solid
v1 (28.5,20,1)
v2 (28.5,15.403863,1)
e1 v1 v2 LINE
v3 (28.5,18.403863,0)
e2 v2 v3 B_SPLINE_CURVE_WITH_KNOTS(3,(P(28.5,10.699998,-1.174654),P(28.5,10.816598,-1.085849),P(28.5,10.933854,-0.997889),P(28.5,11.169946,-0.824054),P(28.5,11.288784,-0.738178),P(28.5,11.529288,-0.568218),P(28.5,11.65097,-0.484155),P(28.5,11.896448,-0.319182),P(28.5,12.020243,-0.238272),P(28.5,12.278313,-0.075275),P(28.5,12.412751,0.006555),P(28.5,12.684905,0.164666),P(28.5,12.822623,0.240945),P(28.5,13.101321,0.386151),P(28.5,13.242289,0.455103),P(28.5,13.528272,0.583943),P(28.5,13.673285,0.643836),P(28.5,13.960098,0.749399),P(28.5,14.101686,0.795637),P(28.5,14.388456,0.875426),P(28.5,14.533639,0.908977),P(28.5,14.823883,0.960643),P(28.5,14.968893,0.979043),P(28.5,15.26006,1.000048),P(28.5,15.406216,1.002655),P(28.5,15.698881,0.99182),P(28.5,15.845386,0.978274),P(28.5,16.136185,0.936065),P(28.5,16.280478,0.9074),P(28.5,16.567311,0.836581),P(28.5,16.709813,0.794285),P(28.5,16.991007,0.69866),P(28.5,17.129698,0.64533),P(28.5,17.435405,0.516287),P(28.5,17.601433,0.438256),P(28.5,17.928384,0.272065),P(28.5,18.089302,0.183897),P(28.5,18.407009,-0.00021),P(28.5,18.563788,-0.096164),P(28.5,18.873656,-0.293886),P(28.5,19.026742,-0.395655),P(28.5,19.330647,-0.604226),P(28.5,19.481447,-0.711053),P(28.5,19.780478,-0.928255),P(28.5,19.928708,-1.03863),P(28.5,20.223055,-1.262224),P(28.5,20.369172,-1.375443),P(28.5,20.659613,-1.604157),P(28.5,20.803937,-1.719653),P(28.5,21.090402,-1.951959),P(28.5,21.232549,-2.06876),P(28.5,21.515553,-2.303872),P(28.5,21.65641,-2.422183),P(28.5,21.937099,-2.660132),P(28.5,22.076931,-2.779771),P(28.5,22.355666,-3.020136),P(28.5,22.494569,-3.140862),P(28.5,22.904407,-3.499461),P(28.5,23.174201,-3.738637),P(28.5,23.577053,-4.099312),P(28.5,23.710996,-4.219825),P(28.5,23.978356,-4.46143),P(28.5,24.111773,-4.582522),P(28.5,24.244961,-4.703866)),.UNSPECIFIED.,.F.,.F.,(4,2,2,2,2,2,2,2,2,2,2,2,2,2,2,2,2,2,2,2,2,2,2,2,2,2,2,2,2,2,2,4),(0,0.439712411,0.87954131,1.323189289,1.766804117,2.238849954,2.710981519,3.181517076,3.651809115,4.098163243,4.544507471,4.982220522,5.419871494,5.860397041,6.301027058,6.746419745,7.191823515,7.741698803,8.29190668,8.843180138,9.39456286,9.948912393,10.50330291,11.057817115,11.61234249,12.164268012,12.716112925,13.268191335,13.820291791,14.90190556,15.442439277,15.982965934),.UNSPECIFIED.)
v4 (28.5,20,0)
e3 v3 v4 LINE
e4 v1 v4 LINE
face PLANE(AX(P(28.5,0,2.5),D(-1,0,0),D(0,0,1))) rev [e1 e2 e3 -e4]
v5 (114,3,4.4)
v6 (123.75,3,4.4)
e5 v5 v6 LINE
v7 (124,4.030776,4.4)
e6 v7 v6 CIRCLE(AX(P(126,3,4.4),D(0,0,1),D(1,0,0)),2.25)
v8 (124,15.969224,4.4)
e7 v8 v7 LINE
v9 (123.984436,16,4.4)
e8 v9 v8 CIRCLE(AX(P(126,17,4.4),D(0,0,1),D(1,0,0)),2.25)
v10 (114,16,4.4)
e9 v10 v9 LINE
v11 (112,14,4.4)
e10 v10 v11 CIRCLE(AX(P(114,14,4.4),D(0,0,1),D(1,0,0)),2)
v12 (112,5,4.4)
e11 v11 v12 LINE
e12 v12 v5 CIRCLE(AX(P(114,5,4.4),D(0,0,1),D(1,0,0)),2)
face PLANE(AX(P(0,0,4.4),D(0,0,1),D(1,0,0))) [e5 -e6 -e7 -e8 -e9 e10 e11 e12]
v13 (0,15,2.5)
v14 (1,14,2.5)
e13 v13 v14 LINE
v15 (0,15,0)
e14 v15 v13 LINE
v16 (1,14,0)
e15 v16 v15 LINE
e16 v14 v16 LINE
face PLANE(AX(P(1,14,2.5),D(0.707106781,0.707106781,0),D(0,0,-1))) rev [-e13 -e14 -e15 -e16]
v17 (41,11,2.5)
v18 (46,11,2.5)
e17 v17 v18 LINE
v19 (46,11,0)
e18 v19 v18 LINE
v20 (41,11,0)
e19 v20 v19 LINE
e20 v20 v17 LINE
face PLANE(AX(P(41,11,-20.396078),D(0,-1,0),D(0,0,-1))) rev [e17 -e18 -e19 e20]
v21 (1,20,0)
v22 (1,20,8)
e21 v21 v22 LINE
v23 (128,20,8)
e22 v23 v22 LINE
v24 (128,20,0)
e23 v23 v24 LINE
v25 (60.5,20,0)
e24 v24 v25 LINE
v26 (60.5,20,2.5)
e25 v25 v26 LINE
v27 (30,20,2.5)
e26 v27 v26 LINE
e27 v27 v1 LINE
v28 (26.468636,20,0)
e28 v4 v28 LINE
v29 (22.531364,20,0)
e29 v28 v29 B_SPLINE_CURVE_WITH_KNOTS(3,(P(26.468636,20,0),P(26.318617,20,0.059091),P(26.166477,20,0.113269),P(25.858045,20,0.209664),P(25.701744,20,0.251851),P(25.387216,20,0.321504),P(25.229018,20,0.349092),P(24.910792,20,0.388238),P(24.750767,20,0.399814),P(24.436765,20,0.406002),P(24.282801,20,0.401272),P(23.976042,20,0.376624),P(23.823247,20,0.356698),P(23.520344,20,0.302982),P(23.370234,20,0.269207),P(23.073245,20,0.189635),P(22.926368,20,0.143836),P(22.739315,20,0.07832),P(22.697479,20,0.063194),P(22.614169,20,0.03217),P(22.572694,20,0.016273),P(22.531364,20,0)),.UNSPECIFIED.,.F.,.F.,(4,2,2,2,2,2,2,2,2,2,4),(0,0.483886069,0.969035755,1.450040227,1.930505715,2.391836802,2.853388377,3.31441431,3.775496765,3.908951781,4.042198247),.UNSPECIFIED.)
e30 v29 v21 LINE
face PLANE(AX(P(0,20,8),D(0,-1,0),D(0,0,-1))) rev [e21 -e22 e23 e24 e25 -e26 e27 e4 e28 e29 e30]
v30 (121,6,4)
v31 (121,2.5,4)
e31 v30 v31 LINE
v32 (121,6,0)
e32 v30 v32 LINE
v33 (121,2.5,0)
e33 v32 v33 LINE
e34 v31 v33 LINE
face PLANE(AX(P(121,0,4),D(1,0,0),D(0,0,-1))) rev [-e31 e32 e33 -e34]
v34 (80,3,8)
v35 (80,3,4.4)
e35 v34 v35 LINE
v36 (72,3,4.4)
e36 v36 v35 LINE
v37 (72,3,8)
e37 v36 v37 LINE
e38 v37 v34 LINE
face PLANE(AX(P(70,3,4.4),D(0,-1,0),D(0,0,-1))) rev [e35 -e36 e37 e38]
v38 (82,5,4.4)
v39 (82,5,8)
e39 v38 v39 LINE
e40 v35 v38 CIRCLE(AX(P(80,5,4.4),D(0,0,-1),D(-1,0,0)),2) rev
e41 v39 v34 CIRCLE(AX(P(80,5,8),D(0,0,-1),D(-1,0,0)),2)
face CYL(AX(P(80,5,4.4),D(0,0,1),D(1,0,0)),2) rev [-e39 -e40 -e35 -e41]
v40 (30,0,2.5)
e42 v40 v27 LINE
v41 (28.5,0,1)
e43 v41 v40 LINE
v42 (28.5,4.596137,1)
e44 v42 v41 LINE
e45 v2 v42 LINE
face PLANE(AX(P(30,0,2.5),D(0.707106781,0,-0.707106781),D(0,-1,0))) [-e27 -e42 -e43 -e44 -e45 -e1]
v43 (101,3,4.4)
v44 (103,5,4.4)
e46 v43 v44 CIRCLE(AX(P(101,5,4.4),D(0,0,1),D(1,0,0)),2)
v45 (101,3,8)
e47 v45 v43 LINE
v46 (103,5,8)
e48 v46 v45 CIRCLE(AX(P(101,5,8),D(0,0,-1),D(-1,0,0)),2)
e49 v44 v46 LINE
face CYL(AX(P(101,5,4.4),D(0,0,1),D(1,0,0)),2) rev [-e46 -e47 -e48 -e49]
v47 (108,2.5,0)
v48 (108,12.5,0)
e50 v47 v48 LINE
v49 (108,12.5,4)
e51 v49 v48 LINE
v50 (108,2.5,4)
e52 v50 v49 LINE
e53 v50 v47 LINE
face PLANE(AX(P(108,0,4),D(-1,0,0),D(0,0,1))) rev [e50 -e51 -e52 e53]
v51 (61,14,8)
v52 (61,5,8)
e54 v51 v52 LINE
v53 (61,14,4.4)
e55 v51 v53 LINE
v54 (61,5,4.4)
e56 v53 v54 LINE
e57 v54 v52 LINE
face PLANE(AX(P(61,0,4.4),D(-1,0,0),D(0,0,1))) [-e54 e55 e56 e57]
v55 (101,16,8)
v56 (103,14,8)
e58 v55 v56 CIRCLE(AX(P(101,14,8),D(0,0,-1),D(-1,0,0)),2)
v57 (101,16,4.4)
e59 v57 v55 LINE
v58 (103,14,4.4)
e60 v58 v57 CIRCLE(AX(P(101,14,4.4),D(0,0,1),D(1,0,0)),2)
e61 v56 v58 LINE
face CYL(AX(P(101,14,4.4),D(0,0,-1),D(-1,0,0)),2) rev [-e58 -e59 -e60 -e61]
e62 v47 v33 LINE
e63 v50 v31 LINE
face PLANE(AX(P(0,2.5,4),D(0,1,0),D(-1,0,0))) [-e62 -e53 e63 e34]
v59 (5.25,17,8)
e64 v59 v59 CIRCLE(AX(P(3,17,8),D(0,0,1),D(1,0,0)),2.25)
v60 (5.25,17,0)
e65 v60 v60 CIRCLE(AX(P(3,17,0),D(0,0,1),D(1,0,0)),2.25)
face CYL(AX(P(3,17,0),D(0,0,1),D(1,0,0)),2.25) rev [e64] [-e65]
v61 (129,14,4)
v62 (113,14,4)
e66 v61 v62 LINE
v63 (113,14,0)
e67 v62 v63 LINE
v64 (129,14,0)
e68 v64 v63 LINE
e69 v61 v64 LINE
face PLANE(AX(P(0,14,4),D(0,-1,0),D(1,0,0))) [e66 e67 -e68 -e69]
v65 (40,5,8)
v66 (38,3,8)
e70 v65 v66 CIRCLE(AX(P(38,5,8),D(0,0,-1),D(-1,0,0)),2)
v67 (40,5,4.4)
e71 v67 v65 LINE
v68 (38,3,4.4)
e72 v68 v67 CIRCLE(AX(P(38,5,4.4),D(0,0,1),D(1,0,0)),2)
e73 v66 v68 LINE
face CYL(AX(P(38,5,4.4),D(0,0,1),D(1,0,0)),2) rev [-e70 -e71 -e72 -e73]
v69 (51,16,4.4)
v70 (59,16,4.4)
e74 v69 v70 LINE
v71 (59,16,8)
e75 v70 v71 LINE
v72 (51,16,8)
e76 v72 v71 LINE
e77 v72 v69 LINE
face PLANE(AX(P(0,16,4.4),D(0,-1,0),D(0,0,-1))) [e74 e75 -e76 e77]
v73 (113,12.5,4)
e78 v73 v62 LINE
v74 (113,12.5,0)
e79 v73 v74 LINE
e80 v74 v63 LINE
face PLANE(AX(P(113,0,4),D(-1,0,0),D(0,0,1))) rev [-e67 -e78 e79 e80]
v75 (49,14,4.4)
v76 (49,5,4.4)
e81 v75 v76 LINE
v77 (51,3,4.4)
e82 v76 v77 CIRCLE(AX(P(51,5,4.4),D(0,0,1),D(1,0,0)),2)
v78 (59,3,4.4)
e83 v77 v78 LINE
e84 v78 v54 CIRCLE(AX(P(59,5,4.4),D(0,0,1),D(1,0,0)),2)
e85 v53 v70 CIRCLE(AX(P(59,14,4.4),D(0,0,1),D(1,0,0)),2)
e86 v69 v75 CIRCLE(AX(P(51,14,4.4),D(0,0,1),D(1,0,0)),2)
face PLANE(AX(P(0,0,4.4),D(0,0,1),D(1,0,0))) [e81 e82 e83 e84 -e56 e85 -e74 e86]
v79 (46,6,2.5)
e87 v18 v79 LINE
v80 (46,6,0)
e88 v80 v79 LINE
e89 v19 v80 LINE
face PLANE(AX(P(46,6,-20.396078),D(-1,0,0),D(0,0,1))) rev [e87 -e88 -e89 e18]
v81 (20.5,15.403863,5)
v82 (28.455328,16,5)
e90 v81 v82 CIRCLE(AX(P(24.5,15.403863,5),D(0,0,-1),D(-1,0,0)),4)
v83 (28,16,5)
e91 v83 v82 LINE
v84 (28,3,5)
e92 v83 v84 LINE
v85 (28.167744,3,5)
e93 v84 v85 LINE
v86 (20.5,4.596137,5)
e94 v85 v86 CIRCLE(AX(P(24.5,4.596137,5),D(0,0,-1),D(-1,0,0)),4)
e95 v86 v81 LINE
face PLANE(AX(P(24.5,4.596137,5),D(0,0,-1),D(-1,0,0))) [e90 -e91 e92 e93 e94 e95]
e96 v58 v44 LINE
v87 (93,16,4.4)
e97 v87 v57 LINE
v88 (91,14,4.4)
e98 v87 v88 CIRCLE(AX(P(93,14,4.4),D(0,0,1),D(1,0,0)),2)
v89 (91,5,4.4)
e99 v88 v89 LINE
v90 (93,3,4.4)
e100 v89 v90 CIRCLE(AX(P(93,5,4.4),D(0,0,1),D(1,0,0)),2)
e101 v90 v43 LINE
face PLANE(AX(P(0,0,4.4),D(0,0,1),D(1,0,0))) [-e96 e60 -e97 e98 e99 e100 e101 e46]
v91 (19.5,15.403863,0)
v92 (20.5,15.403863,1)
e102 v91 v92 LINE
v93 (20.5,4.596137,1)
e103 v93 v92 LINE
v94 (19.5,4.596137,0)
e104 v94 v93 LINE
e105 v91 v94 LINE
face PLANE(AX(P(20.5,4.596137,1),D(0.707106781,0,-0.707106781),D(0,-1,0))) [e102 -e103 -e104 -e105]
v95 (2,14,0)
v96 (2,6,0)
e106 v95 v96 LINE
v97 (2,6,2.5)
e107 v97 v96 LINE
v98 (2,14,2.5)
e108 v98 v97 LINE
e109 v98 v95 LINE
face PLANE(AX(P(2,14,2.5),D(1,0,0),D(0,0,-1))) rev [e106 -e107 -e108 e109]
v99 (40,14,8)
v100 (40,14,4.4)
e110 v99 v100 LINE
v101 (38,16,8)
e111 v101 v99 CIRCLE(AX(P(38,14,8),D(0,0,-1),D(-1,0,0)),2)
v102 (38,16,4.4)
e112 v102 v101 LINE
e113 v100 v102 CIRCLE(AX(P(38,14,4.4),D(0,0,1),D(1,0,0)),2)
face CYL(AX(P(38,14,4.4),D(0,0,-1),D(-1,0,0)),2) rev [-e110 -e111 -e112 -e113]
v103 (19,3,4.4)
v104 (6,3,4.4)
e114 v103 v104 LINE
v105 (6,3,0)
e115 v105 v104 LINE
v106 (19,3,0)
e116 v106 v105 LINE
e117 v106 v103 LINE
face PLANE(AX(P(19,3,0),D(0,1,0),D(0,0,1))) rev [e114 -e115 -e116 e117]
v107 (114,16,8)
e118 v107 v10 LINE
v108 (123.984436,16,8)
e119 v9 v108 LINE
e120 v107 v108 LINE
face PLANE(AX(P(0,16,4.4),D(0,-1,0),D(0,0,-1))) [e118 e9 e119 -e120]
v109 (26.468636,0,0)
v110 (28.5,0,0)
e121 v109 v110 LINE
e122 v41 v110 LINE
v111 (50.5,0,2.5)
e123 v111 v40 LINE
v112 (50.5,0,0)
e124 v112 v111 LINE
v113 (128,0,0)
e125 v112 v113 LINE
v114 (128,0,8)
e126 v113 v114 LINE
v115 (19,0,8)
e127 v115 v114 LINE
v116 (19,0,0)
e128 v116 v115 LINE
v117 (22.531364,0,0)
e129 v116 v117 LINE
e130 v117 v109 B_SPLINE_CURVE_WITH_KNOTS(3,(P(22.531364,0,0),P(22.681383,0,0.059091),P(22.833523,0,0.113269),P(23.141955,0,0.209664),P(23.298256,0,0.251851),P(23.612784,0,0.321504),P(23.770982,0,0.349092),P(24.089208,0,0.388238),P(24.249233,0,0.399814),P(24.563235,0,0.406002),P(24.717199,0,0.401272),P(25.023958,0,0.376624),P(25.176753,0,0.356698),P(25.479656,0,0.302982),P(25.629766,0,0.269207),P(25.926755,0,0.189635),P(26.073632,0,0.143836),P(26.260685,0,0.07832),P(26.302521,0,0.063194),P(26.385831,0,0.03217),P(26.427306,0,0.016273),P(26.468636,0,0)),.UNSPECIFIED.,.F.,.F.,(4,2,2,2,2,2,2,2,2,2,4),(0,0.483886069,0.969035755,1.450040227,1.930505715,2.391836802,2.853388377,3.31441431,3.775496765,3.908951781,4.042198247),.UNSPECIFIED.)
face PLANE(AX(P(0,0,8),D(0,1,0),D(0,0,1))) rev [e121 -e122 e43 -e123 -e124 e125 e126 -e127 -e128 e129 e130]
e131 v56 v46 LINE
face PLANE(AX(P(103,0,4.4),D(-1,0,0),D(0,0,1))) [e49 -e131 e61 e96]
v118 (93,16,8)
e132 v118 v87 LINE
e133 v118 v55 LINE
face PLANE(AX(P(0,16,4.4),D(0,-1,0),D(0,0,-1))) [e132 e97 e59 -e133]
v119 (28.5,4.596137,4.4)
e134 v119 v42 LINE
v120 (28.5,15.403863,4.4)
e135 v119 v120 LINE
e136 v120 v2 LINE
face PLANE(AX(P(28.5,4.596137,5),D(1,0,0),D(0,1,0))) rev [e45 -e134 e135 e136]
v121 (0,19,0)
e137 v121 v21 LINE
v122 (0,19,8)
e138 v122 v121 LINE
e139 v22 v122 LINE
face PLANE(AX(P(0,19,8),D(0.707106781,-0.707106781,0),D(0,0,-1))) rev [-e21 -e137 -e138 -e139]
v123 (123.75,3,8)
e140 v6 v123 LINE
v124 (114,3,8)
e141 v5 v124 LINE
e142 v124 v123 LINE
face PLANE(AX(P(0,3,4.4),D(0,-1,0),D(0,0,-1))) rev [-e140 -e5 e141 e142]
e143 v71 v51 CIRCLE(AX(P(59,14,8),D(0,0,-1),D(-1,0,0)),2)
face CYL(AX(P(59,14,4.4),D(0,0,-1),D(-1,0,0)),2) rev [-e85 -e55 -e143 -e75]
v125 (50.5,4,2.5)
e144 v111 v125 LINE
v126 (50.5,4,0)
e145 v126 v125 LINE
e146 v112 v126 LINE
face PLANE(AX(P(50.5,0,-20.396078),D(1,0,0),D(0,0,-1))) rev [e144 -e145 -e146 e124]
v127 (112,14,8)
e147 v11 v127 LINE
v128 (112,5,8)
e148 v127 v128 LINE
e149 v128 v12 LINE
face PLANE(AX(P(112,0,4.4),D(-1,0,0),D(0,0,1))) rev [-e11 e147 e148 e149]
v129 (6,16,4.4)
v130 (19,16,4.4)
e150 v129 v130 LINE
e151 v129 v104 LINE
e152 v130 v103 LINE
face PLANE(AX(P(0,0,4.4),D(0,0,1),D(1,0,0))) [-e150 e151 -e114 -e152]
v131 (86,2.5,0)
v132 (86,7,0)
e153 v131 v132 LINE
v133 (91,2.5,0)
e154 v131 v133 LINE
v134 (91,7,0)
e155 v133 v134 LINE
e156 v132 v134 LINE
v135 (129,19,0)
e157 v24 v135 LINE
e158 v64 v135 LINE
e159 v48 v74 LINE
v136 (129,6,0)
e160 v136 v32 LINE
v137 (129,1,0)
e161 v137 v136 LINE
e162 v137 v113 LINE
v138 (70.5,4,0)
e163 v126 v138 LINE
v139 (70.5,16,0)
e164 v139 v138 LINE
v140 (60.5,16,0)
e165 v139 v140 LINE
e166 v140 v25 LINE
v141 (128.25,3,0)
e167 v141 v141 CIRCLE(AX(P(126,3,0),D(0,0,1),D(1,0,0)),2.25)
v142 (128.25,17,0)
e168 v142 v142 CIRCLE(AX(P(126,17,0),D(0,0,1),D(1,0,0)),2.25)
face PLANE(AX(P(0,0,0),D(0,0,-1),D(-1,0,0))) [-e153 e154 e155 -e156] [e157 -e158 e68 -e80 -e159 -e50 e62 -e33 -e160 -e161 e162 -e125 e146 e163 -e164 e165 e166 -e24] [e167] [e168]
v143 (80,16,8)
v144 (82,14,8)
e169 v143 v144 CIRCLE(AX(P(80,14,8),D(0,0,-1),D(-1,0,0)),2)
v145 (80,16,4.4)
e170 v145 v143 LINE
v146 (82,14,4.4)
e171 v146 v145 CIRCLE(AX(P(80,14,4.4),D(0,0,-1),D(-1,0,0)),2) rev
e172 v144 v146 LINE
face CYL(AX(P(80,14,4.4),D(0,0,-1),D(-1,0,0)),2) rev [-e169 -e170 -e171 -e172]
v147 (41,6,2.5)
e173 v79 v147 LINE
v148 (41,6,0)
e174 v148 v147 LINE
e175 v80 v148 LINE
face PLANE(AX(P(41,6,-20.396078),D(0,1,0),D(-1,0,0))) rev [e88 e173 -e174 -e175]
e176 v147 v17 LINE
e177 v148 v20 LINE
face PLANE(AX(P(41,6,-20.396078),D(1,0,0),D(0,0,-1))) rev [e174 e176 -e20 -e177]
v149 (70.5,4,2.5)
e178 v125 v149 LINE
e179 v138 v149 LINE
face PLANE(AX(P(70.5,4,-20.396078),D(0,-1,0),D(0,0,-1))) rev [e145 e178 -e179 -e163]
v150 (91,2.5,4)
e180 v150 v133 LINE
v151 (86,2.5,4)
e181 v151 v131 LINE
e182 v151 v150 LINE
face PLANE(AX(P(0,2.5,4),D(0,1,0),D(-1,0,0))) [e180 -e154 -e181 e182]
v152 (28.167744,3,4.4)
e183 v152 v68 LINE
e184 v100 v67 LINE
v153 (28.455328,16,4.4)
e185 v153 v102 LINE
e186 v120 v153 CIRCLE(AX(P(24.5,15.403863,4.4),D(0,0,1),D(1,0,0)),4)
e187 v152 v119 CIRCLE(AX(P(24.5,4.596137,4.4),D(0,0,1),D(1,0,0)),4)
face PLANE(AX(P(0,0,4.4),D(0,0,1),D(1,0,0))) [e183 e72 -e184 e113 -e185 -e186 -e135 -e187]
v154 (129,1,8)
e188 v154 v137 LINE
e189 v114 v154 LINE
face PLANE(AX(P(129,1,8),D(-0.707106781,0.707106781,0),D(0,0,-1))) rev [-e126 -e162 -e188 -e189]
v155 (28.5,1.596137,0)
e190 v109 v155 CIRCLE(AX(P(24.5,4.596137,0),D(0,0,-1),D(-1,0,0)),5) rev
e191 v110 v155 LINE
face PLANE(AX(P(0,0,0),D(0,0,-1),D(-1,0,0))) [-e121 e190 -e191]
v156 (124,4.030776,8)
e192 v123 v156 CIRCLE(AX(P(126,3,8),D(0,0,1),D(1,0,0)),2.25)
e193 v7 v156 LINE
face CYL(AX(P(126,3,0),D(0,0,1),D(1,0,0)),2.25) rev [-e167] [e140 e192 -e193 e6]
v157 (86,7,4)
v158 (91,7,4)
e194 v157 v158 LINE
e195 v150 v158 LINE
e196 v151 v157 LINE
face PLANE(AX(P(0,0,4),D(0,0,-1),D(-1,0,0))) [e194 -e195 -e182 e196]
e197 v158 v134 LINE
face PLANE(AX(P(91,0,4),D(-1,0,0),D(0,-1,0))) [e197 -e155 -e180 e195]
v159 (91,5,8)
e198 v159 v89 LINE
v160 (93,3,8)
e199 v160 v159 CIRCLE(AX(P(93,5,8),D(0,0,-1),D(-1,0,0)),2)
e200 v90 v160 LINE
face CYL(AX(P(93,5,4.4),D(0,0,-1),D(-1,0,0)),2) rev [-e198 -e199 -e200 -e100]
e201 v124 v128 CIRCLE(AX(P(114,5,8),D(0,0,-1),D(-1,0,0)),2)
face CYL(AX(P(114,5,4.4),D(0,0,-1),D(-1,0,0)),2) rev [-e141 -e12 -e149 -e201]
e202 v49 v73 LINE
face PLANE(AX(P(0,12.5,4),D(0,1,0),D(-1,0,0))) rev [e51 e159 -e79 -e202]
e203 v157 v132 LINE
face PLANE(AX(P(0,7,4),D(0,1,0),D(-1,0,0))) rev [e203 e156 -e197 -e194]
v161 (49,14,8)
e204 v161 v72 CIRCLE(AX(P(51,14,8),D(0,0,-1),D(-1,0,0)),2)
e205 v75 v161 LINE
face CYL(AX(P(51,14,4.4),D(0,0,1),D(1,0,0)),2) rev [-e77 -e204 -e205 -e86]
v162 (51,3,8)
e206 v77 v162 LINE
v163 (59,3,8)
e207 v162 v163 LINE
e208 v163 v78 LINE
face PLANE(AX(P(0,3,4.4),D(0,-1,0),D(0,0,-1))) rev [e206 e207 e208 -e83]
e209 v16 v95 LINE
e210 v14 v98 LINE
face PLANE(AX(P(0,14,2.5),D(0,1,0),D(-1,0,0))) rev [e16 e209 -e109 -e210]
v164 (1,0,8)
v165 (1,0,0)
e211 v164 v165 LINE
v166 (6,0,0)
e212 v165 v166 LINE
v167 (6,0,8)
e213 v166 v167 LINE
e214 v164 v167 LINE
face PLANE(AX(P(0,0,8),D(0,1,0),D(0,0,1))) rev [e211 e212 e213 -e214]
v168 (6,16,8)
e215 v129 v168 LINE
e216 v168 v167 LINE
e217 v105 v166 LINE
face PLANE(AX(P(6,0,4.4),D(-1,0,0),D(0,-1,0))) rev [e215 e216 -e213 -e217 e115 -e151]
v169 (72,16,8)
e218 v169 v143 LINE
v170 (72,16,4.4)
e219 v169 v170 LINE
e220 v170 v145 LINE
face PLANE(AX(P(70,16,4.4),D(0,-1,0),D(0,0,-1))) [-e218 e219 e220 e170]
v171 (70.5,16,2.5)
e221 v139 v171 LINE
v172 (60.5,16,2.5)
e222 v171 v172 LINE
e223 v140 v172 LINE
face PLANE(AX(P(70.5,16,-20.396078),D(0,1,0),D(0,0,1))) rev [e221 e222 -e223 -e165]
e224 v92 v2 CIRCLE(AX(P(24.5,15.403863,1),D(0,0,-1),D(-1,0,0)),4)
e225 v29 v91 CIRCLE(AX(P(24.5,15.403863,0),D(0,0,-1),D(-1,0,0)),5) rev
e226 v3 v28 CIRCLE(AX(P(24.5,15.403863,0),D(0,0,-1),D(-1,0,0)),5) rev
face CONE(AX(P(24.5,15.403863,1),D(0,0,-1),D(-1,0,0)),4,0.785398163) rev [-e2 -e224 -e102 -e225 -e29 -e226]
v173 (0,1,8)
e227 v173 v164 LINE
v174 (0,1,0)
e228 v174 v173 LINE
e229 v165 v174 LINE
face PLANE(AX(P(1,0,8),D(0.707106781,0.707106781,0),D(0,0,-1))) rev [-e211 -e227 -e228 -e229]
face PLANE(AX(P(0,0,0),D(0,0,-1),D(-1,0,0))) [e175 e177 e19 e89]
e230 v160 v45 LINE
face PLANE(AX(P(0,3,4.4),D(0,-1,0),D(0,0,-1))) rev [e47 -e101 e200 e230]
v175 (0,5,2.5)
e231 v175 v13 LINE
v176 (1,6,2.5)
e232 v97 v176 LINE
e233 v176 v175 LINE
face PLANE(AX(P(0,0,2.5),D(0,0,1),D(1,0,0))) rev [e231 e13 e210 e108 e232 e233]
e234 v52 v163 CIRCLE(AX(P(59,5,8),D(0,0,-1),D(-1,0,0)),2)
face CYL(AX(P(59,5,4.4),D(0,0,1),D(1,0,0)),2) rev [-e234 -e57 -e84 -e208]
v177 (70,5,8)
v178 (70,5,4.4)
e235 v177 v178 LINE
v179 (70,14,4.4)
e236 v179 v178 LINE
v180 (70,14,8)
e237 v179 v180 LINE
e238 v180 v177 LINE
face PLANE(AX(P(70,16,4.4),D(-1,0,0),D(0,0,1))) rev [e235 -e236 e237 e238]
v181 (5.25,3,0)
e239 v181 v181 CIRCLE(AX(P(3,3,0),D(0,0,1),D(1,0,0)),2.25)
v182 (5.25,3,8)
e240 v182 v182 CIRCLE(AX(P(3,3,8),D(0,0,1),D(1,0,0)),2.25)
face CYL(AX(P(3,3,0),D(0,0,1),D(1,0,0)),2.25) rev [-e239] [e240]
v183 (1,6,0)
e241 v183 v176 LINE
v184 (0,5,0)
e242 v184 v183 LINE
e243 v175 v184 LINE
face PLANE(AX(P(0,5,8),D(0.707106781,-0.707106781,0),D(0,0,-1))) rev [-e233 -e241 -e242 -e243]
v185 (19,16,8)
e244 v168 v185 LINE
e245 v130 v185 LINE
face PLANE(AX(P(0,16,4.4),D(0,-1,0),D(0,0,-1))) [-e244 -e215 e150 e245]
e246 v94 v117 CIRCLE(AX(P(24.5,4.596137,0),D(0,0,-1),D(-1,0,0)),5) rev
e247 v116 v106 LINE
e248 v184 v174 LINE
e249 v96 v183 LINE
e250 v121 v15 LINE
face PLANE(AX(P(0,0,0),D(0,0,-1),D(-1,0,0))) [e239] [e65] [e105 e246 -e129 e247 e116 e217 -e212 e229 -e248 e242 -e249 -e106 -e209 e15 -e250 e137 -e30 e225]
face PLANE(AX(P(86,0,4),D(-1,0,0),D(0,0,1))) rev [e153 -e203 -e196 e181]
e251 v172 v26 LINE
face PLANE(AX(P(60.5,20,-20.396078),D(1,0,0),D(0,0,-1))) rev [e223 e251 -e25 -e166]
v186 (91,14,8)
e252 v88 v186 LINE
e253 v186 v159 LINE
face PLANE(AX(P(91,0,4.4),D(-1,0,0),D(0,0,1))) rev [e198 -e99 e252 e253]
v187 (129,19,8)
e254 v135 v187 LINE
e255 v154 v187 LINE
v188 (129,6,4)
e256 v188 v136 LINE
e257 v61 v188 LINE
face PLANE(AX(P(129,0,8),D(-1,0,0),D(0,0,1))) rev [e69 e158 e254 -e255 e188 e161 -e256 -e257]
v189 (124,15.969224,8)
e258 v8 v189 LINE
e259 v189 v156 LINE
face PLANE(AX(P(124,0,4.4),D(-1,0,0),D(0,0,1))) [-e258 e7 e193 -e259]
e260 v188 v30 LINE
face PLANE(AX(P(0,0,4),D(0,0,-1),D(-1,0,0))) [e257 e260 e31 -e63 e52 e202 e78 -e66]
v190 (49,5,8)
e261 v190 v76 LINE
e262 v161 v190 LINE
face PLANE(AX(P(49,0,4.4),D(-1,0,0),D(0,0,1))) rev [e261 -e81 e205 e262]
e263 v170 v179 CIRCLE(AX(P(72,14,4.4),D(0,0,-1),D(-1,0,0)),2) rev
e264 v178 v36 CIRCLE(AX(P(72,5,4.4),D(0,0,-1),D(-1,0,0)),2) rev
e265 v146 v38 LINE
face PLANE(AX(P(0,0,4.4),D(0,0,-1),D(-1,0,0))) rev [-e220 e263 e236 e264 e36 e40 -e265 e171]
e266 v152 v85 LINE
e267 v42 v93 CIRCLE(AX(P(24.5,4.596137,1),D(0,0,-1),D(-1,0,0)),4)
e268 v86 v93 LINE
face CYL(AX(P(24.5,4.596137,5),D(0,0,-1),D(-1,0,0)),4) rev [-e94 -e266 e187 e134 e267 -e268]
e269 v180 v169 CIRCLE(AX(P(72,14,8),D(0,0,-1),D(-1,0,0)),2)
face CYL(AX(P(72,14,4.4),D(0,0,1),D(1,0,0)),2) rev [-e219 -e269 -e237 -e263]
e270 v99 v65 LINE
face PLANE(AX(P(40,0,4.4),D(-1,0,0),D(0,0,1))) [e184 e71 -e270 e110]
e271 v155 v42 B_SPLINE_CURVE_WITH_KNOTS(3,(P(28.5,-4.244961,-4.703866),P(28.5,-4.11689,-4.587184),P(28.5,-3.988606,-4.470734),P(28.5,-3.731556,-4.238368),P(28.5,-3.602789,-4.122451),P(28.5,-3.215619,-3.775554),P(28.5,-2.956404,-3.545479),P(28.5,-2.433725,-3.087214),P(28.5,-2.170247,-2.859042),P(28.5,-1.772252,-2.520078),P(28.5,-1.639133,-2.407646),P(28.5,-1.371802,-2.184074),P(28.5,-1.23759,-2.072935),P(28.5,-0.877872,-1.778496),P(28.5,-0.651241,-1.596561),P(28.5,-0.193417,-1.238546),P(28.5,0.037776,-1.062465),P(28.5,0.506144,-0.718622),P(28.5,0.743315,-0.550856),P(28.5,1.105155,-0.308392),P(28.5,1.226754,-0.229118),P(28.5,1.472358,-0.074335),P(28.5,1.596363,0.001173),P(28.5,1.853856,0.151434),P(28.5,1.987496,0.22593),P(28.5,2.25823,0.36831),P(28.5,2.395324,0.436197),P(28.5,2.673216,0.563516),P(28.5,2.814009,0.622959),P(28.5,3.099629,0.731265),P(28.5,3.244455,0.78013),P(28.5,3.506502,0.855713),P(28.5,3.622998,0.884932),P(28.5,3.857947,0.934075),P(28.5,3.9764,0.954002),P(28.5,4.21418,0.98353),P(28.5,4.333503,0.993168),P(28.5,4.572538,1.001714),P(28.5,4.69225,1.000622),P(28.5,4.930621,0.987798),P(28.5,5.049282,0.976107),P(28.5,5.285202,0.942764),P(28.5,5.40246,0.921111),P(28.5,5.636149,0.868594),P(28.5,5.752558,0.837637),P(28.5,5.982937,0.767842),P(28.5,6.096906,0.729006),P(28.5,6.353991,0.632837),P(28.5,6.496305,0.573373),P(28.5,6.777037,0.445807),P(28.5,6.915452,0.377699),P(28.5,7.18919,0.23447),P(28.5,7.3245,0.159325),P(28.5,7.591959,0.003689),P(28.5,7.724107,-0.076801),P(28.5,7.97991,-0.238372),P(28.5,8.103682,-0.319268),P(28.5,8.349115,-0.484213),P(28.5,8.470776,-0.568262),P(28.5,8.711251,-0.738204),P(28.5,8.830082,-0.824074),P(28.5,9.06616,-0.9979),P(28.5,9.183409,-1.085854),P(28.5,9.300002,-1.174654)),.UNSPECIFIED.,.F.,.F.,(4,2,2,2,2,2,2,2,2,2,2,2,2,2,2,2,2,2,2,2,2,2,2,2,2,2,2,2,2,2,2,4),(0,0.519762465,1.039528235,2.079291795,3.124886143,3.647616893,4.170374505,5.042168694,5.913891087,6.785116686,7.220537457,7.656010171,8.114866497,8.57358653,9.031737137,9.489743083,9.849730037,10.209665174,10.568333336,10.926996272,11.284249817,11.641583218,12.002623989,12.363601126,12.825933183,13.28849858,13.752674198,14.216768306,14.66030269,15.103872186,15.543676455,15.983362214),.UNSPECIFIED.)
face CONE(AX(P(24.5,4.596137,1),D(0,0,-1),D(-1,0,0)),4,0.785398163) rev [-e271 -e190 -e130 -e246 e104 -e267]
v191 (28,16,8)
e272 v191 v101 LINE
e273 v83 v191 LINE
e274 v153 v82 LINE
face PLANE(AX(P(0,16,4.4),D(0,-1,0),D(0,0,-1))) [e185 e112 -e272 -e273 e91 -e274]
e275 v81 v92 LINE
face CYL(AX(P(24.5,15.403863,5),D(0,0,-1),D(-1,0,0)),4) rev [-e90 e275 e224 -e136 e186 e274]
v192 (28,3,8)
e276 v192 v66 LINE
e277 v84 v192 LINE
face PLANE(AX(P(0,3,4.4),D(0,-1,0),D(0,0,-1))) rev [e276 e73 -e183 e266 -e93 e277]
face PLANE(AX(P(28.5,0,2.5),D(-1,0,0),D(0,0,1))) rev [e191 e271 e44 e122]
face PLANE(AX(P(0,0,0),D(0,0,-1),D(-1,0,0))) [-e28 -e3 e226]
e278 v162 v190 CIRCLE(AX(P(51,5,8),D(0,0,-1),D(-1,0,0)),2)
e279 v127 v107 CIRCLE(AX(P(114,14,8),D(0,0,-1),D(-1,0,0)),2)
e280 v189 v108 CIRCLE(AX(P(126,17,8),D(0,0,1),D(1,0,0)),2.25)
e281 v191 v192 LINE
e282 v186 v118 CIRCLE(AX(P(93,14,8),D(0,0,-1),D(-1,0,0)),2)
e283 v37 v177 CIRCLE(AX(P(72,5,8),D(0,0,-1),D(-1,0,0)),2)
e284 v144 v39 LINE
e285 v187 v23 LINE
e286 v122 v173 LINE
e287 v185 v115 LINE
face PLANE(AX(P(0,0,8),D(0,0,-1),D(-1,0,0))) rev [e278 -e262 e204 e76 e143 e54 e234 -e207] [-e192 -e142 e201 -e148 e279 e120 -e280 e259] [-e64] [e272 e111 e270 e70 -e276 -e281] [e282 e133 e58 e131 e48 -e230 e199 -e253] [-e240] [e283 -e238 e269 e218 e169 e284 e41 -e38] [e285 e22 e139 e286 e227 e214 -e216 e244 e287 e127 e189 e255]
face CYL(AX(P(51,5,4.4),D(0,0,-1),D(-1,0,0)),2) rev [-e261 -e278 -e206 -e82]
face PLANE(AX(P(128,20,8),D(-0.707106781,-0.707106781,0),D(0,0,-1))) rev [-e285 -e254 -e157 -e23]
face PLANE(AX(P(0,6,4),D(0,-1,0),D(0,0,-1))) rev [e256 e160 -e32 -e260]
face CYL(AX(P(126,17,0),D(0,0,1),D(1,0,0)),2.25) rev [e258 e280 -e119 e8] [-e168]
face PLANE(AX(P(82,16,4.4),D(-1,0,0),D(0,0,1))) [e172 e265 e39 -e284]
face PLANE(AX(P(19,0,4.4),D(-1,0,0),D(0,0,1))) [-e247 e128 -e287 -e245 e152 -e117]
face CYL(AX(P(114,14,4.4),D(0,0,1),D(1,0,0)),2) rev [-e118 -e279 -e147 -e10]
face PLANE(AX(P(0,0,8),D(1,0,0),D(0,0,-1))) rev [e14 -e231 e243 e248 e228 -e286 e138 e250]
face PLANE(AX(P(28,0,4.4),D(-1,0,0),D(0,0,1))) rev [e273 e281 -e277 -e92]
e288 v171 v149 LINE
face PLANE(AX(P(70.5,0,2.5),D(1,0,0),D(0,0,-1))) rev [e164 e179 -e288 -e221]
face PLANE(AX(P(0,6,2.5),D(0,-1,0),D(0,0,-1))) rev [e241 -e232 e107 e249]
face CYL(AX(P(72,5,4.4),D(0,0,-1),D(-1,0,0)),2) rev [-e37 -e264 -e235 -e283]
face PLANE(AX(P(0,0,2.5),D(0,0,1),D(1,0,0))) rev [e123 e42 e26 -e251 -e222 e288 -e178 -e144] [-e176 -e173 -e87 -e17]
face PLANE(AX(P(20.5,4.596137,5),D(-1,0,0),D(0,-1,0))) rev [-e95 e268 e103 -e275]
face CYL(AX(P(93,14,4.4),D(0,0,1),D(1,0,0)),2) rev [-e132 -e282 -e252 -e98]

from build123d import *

# Parameters (mm, degrees)
SKETCH1_W               = 129
SKETCH1_H               = 20
BOSS_EXTRUDE1_DEPTH     = 8
SKETCH2_W               = 13
SKETCH2_H               = 15
SKETCH2_W_2             = 12
SKETCH2_H_2             = 13
CUT_EXTRUDE4_DEPTH      = 3.6
SKETCH2_5_R             = 2.25
CUT_EXTRUDE7_DEPTH      = 131.786084887
CUT_EXTRUDE8_DEPTH      = 131.615313038
CUT_EXTRUDE8_DEPTH_BACK = 131.615313038
SKETCH3_W               = 13
SKETCH3_H               = 3
CUT_EXTRUDE9_DEPTH      = 5
CHAMFER1_SIZE           = 1
SKETCH5_W               = 42
SKETCH5_H               = 20
SKETCH5_W_2             = 2
SKETCH5_H_2             = 8
CUT_EXTRUDE10_DEPTH     = 2.5
CHAMFER2_DEPTH          = 20
SKETCH6_W               = 5
SKETCH6_H               = 4.5
SKETCH6_W_2             = 8
SKETCH6_H_2             = 3.5
CUT_EXTRUDE11_DEPTH     = 4
SKETCH7_W               = 20
SKETCH7_H               = 4
SKETCH7_W_2             = 10
SKETCH7_W_3             = 5
SKETCH7_H_2             = 5
BOSS_EXTRUDE2_DEPTH     = 2.5
CHAMFER3_SIZE           = 1
FILLET1_R               = 2
CHAMFER4_SIZE           = 1


with BuildPart() as part:
    # Sketch1 → Boss-Extrude1 (new body)
    with BuildSketch(Plane.XY):
        with Locations((64.5, 10)):
            Rectangle(SKETCH1_W, SKETCH1_H)
    extrude(amount=BOSS_EXTRUDE1_DEPTH)

    # Sketch2 → Cut-Extrude4 (cut)
    with BuildSketch(Plane.XY.offset(8)):
        with Locations((12.5, 8.5)):
            Rectangle(SKETCH2_W, SKETCH2_H)
        with Locations((55, 9.5)):
            Rectangle(SKETCH2_W_2, SKETCH2_H_2)
        with Locations((34, 9.5)):
            Rectangle(SKETCH2_W_2, SKETCH2_H_2)
        with Locations((76, 9.5)):
            Rectangle(SKETCH2_W_2, SKETCH2_H_2)
        with Locations((97, 9.5)):
            Rectangle(SKETCH2_W_2, SKETCH2_H_2)
        with BuildLine():
            Line((112, 16), (112, 3))
            Line((112, 3), (123.75, 3))
            ThreePointArc((123.75, 3), (123.813393039, 3.530330086), (124, 4.030776406))
            Line((124, 4.030776406), (124, 15.969223594))
            ThreePointArc((124, 15.969223594), (123.992158813, 15.984581975), (123.984435563, 16))
            Line((123.984435563, 16), (112, 16))
        make_face()
    extrude(amount=-CUT_EXTRUDE4_DEPTH, mode=Mode.SUBTRACT)

    # Sketch2<5> → Cut-Extrude7 (cut, through all)
    with BuildSketch(Plane.XY.offset(8)):
        with Locations((126, 3)):
            Circle(SKETCH2_5_R)
        with Locations((126, 17)):
            Circle(SKETCH2_5_R)
        with Locations((3, 17)):
            Circle(SKETCH2_5_R)
        with Locations((3, 3)):
            Circle(SKETCH2_5_R)
    extrude(amount=-CUT_EXTRUDE7_DEPTH, mode=Mode.SUBTRACT)

    # Sketch3 → Cut-Extrude8 (cut, two sides: drawn at the far end of the back side and taken through both)
    with BuildSketch(Plane.XY.offset(4.4).offset(-CUT_EXTRUDE8_DEPTH_BACK)):
        with Locations((12.5, 1.5)):
            Rectangle(SKETCH3_W, SKETCH3_H)
    extrude(amount=CUT_EXTRUDE8_DEPTH + CUT_EXTRUDE8_DEPTH_BACK, mode=Mode.SUBTRACT)

    # Sketch4 → Cut-Extrude9 (cut)
    with BuildSketch(Plane(origin=(0, 0, 0), x_dir=(-1, 0, 0), z_dir=(0, 0, -1))):
        with BuildLine():
            Line((-28.5, 4.596136616), (-28.5, 15.403863384))
            ThreePointArc((-28.5, 15.403863384), (-24.5, 19.403863384), (-20.5, 15.403863384))
            Line((-20.5, 15.403863384), (-20.5, 4.596136616))
            ThreePointArc((-20.5, 4.596136616), (-24.5, 0.596136616), (-28.5, 4.596136616))
        make_face()
    extrude(amount=-CUT_EXTRUDE9_DEPTH, mode=Mode.SUBTRACT)

    # Chamfer1
    # the kernel refuses this chamfer: 1 mm, written as the material it takes off along each edge
    with BuildSketch(Plane(origin=(24.5, 4.596136616, 0), x_dir=(-1, 0, 0), z_dir=(0, 1, 0))) as chamfer1_piece_1:
        Polygon((4 + CHAMFER1_SIZE, 0), (4, CHAMFER1_SIZE), (4, 0), align=None)
    revolve(axis=Axis((24.5, 4.596136616, 0), (0, 0, 1)), revolution_arc=180, mode=Mode.SUBTRACT)
    with BuildSketch(Plane(origin=(20.5, 15.403863384, 0), x_dir=(-1, 0, 0), z_dir=(0, -1, 0)), Plane(origin=(28.5, 4.596136616, 0), x_dir=(1, 0, 0), z_dir=(0, 1, 0))) as chamfer1_piece_2:
        Polygon((CHAMFER1_SIZE, 0), (0, -CHAMFER1_SIZE), (0, 0), align=None)
    extrude(amount=10.807726767, mode=Mode.SUBTRACT)
    with BuildSketch(Plane(origin=(24.5, 15.403863384, 0), x_dir=(1, 0, 0), z_dir=(0, -1, 0))) as chamfer1_piece_3:
        Polygon((4 + CHAMFER1_SIZE, 0), (4, CHAMFER1_SIZE), (4, 0), align=None)
    revolve(axis=Axis((24.5, 15.403863384, 0), (0, 0, 1)), revolution_arc=180, mode=Mode.SUBTRACT)

    # Sketch5 → Cut-Extrude10 (cut)
    with BuildSketch(Plane(origin=(0, 0, 0), x_dir=(-1, 0, 0), z_dir=(0, 0, -1))):
        with Locations((-49.5, 10)):
            Rectangle(SKETCH5_W, SKETCH5_H)
        with Locations((-1, 10)):
            Rectangle(SKETCH5_W_2, SKETCH5_H_2)
    extrude(amount=-CUT_EXTRUDE10_DEPTH, mode=Mode.SUBTRACT)

    # Chamfer2: read off the stored shape, not the designer's step
    # Chamfer2 outline → Chamfer2 (add)
    with BuildSketch(Plane(origin=(0, 0, 0), x_dir=(1, 0, 0), z_dir=(0, 1, 0))):
        Polygon((28.5, -1), (28.5, -2.5), (30, -2.5), align=None)
    extrude(amount=CHAMFER2_DEPTH)

    # Sketch6 → Cut-Extrude11 (cut)
    with BuildSketch(Plane(origin=(0, 0, 0), x_dir=(-1, 0, 0), z_dir=(0, 0, -1))):
        with Locations((-88.5, 4.75)):
            Rectangle(SKETCH6_W, SKETCH6_H)
        Polygon((-113, 2.5), (-108, 2.5), (-108, 12.5), (-113, 12.5), (-113, 10), (-113, 6), align=None)
        with Locations((-117, 4.25)):
            Rectangle(SKETCH6_W_2, SKETCH6_H_2)
        Polygon((-121, 6), (-113, 6), (-113, 10), (-129, 10), (-129, 6), align=None)
        Polygon((-113, 10), (-113, 12.5), (-113, 14), (-129, 14), (-129, 10), align=None)
    extrude(amount=-CUT_EXTRUDE11_DEPTH, mode=Mode.SUBTRACT)

    # Sketch7 → Boss-Extrude2 (add)
    with BuildSketch(Plane(origin=(0, 0, 2.5), x_dir=(-1, 0, 0), z_dir=(0, 0, -1))):
        with Locations((-60.5, 2)):
            Rectangle(SKETCH7_W, SKETCH7_H)
        with Locations((-65.5, 18)):
            Rectangle(SKETCH7_W_2, SKETCH7_H)
        with Locations((-43.5, 8.5)):
            Rectangle(SKETCH7_W_3, SKETCH7_H_2)
    extrude(amount=BOSS_EXTRUDE2_DEPTH)

    # Chamfer3
    chamfer3_edges = [part.edges().sort_by_distance(p)[0] for p in [
        (0, 14, 1.25),
        (0, 6, 1.25),
    ]]
    chamfer(chamfer3_edges, length=CHAMFER3_SIZE)

    # Fillet1
    fillet1_edges = [part.edges().sort_by_distance(p)[0] for p in [
        (112, 3, 6.2),
        (112, 16, 6.2),
        (70, 16, 6.2),
        (82, 16, 6.2),
        (82, 3, 6.2),
        (70, 3, 6.2),
        (40, 16, 6.2),
        (40, 3, 6.2),
        (61, 16, 6.2),
        (61, 3, 6.2),
        (49, 3, 6.2),
        (49, 16, 6.2),
        (103, 16, 6.2),
        (103, 3, 6.2),
        (91, 3, 6.2),
        (91, 16, 6.2),
    ]]
    fillet(fillet1_edges, radius=FILLET1_R)

    # Chamfer4
    chamfer4_edges = [part.edges().sort_by_distance(p)[0] for p in [
        (0, 20, 4),
        (129, 20, 4),
        (129, 0, 4),
        (0, 0, 4),
    ]]
    chamfer(chamfer4_edges, length=CHAMFER4_SIZE)


solid = part.part
